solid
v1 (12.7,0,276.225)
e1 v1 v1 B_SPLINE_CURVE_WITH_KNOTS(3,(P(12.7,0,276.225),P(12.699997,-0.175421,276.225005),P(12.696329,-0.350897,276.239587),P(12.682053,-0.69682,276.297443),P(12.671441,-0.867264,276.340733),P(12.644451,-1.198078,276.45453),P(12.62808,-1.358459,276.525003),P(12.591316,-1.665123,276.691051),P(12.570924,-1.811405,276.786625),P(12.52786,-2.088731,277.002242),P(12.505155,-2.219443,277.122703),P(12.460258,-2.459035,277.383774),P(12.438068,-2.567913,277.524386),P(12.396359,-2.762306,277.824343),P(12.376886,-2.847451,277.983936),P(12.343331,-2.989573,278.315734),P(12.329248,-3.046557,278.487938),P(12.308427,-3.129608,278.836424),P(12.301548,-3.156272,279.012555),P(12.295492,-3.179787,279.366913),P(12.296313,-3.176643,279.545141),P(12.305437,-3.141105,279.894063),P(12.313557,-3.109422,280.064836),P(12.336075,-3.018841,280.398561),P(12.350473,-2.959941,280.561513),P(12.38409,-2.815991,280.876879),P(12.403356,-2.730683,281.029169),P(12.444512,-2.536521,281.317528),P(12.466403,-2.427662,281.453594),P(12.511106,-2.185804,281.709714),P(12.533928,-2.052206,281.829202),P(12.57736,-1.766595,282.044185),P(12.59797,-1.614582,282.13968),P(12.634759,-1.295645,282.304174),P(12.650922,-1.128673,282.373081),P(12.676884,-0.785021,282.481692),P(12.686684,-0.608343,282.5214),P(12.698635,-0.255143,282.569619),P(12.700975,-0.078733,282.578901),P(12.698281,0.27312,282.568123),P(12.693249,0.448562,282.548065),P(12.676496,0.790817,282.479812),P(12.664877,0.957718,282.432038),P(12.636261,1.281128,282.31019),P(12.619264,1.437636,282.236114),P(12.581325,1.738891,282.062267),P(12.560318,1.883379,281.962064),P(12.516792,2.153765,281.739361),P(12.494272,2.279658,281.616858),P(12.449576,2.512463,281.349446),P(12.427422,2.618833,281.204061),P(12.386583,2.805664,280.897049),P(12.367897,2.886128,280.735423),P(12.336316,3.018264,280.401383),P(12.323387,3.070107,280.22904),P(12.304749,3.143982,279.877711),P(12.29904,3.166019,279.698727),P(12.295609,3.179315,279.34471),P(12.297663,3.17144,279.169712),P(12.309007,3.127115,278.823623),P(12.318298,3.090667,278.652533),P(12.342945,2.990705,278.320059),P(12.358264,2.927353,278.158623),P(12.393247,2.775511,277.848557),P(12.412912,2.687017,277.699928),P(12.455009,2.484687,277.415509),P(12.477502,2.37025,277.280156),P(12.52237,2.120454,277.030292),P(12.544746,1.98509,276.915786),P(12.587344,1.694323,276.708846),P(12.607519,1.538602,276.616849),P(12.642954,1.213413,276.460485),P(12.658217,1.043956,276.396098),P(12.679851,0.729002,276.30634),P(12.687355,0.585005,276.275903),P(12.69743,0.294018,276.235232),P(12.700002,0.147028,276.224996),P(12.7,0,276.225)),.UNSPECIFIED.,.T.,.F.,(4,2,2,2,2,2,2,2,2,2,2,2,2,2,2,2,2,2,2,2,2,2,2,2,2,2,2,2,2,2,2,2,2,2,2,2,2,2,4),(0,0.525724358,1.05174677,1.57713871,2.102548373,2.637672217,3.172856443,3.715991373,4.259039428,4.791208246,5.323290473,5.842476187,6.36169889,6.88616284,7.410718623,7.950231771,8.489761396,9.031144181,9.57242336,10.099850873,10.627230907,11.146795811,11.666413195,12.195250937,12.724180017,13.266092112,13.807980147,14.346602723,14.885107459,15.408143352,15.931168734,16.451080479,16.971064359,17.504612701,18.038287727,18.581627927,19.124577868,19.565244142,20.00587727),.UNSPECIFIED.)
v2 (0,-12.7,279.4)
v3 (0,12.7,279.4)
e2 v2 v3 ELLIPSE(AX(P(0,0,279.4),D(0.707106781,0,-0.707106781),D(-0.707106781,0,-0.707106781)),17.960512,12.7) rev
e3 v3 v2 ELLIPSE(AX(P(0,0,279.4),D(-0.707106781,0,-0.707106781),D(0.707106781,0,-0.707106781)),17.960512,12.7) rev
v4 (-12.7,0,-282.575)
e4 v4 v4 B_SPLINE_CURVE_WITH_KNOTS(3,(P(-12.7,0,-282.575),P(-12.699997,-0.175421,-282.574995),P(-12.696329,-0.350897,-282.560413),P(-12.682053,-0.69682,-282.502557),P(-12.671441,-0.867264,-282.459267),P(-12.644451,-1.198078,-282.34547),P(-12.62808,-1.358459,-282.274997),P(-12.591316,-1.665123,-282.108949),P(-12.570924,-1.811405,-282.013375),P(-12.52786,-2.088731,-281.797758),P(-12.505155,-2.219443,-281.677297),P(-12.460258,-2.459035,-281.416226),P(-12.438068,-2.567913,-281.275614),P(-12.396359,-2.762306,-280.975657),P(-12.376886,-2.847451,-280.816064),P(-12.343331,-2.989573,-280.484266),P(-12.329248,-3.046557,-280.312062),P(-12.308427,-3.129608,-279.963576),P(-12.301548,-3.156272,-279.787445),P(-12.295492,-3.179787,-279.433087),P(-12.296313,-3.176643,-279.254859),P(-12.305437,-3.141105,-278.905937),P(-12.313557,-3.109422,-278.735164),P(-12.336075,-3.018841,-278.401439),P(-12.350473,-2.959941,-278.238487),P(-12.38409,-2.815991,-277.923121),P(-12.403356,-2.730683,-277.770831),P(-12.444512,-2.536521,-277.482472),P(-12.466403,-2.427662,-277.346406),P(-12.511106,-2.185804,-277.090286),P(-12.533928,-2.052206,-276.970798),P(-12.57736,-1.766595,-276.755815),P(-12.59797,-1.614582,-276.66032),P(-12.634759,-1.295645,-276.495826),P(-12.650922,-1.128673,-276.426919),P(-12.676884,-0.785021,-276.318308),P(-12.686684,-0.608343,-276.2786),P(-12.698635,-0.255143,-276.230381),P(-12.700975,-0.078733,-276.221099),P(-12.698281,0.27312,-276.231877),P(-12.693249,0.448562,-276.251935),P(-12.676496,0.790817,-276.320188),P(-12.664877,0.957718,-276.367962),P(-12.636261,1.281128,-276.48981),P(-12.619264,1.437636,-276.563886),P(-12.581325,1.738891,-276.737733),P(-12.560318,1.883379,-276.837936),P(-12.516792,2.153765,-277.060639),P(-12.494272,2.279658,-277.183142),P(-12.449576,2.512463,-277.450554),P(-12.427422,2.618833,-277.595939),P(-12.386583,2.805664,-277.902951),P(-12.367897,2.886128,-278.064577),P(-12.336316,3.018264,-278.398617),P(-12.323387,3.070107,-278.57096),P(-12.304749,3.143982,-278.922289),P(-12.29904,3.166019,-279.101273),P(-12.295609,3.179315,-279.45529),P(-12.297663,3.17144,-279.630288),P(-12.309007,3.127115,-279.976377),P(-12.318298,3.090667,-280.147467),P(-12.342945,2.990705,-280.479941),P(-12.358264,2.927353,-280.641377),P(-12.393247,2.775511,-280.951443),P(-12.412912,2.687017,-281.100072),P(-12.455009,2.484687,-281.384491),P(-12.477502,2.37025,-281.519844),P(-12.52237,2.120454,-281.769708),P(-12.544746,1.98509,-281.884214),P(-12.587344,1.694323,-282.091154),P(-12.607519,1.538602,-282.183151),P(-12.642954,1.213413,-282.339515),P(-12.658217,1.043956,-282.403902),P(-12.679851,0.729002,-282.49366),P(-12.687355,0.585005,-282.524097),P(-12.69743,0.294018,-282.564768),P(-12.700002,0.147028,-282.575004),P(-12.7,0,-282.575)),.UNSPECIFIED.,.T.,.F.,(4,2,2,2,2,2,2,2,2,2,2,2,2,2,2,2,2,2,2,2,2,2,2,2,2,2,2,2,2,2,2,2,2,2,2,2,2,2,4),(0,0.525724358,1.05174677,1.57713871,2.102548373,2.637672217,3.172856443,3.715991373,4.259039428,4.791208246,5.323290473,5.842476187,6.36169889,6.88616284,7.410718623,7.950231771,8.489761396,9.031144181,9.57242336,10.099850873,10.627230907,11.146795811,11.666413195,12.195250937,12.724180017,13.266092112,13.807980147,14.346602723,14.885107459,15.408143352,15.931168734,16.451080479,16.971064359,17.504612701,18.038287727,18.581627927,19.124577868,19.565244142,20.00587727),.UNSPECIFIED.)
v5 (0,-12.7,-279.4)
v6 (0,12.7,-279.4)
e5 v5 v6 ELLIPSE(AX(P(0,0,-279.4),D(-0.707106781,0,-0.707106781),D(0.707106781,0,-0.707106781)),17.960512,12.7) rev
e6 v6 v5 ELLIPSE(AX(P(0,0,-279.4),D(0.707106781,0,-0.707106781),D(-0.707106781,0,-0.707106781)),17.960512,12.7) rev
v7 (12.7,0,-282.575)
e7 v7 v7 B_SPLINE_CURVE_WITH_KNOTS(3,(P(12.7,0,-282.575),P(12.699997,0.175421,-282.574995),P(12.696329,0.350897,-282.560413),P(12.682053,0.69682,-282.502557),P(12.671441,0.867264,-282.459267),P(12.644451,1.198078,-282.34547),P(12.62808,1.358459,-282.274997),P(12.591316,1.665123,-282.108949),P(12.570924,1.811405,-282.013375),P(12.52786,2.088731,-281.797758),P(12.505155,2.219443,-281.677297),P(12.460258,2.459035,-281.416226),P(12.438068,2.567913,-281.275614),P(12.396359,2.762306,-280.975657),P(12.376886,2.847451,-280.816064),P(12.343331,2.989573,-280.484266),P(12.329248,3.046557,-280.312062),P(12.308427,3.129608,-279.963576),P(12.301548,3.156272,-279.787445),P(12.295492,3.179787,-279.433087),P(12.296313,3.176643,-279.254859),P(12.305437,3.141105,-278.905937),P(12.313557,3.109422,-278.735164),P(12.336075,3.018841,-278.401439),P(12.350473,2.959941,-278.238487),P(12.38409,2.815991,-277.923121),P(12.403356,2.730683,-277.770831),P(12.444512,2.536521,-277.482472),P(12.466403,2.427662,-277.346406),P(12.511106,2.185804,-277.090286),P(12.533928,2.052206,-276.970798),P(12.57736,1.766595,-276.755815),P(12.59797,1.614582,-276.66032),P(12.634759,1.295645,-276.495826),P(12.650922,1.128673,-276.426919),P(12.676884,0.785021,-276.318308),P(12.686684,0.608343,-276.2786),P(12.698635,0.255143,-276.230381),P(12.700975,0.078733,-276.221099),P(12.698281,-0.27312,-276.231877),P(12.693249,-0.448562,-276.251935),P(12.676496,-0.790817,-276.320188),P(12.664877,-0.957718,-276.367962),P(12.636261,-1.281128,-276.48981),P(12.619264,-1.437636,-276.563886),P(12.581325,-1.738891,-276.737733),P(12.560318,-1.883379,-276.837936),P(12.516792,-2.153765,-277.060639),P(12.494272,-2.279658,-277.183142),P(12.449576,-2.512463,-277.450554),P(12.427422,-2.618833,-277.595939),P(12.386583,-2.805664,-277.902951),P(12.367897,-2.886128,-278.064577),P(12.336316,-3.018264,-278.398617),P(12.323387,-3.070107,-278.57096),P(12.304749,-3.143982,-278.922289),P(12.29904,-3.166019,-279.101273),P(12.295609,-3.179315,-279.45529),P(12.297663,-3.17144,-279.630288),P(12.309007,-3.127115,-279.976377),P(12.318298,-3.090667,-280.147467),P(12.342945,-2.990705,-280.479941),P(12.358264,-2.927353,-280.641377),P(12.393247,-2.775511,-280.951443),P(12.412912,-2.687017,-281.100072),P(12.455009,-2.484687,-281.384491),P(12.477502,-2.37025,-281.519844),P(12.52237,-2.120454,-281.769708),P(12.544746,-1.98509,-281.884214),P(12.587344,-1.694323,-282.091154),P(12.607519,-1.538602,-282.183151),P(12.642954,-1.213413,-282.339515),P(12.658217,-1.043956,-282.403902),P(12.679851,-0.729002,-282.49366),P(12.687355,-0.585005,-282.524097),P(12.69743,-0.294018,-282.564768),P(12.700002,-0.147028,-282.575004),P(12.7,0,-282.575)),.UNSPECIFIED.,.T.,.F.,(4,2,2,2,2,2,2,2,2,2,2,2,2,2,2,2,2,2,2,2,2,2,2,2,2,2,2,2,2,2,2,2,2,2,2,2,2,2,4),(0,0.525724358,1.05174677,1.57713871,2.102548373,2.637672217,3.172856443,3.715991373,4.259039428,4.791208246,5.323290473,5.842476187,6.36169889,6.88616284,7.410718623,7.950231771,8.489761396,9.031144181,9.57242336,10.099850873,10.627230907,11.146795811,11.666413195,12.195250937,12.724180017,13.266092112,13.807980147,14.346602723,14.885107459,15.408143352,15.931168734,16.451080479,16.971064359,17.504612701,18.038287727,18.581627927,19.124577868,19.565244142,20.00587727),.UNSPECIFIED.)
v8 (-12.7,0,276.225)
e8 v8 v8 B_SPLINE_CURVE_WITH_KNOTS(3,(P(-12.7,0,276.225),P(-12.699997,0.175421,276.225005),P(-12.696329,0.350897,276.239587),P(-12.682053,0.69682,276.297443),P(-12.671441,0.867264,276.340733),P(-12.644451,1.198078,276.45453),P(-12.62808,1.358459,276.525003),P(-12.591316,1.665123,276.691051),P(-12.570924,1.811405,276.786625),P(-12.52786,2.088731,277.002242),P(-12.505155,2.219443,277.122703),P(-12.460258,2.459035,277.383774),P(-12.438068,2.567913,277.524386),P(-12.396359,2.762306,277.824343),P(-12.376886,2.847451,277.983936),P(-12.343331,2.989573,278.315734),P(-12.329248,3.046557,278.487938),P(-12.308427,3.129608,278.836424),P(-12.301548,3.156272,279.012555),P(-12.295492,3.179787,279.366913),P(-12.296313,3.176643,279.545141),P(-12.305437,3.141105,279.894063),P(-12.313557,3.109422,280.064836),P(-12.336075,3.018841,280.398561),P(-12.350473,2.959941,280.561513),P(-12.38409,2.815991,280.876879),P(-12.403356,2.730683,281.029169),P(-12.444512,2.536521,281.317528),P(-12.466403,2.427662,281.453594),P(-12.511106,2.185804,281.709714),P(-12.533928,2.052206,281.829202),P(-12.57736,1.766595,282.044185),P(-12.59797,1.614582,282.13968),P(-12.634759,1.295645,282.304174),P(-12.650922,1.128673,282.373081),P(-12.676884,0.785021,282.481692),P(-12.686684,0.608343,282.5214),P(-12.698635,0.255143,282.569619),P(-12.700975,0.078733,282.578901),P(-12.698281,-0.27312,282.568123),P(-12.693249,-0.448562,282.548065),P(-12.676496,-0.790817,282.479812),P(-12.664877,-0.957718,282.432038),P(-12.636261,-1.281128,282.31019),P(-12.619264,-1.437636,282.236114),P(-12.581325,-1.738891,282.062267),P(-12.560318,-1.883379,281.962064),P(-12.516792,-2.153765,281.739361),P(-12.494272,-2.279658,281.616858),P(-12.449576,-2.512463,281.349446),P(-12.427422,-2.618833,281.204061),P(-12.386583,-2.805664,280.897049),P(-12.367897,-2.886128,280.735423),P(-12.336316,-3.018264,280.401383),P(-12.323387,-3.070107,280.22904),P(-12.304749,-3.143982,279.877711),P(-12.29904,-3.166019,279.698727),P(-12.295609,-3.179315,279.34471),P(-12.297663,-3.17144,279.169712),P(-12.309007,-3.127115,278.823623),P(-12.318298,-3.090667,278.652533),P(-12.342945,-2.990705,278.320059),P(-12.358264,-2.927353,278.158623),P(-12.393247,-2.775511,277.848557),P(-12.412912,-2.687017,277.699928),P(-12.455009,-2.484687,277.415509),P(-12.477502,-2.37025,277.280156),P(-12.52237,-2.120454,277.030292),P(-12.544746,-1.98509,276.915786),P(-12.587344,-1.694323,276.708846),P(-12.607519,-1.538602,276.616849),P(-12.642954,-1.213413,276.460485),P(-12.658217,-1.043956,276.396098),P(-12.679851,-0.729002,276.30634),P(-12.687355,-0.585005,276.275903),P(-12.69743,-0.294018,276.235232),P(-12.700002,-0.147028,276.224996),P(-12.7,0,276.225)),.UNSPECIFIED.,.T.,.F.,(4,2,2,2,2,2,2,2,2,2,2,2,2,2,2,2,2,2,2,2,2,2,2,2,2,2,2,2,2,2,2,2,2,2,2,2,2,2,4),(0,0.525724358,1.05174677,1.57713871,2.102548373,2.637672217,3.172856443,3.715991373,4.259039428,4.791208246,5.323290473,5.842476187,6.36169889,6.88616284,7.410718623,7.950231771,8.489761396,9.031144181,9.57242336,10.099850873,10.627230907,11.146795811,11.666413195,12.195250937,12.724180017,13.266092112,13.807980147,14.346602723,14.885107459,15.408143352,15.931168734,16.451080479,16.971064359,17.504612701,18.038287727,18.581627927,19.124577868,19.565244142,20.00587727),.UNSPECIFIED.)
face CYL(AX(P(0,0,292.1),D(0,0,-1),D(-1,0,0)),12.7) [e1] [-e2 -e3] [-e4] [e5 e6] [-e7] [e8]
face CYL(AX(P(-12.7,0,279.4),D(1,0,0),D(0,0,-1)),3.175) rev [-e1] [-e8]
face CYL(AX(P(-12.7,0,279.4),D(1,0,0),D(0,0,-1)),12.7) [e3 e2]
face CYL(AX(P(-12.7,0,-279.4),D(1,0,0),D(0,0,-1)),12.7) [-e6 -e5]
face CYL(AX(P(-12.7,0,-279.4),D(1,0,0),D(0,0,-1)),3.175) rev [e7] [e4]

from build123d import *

# Parameters (mm, degrees)
SKETCH1_R              = 12.7
BOSS_EXTRUDE1_DEPTH    = 292.1
CUT_EXTRUDE2_START     = -12.700000102
CUT_EXTRUDE2_OUTLINE_R = 3.175
CUT_EXTRUDE2_DEPTH     = 25.400000102


# Read off the part's stored shape, not the designer's step: Cut-Extrude2
with BuildPart() as part:
    # Sketch1 → Boss-Extrude1 (new, symmetric)
    with BuildSketch(Plane.XY):
        Circle(SKETCH1_R)
    extrude(amount=BOSS_EXTRUDE1_DEPTH, both=True)

    # Cut-Extrude2 outline → Cut-Extrude2 (cut)
    with BuildSketch(Plane(origin=(0, 0, 0), x_dir=(0, 0, -1), z_dir=(1, 0, 0)).offset(CUT_EXTRUDE2_START)):
        with BuildLine():
            ThreePointArc((-292.1, 3.2e-08), (-288.38025611, 8.980256132), (-279.4, 12.7))
            Line((-279.4, 12.7), (-292.1, 12.7))
            Line((-292.1, 12.7), (-292.1, 3.2e-08))
        make_face()
        with BuildLine():
            Line((292.1, 12.7), (279.4, 12.7))
            ThreePointArc((279.4, 12.7), (288.38025611, 8.980256132), (292.1, 3.2e-08))
            Line((292.1, 3.2e-08), (292.1, 12.7))
        make_face()
        with BuildLine():
            ThreePointArc((-279.4, -12.7), (-288.380256132, -8.98025611), (-292.1, 3.2e-08))
            Line((-292.1, 3.2e-08), (-292.1, -12.7))
            Line((-292.1, -12.7), (-279.4, -12.7))
        make_face()
        with BuildLine():
            Line((292.1, -12.7), (292.1, 3.2e-08))
            ThreePointArc((292.1, 3.2e-08), (288.380256132, -8.98025611), (279.4, -12.7))
            Line((279.4, -12.7), (292.1, -12.7))
        make_face()
        with Locations((-279.4, 0)):
            Circle(CUT_EXTRUDE2_OUTLINE_R)
        with Locations((279.4, 0)):
            Circle(CUT_EXTRUDE2_OUTLINE_R)
    extrude(amount=CUT_EXTRUDE2_DEPTH, mode=Mode.SUBTRACT)


solid = part.part
